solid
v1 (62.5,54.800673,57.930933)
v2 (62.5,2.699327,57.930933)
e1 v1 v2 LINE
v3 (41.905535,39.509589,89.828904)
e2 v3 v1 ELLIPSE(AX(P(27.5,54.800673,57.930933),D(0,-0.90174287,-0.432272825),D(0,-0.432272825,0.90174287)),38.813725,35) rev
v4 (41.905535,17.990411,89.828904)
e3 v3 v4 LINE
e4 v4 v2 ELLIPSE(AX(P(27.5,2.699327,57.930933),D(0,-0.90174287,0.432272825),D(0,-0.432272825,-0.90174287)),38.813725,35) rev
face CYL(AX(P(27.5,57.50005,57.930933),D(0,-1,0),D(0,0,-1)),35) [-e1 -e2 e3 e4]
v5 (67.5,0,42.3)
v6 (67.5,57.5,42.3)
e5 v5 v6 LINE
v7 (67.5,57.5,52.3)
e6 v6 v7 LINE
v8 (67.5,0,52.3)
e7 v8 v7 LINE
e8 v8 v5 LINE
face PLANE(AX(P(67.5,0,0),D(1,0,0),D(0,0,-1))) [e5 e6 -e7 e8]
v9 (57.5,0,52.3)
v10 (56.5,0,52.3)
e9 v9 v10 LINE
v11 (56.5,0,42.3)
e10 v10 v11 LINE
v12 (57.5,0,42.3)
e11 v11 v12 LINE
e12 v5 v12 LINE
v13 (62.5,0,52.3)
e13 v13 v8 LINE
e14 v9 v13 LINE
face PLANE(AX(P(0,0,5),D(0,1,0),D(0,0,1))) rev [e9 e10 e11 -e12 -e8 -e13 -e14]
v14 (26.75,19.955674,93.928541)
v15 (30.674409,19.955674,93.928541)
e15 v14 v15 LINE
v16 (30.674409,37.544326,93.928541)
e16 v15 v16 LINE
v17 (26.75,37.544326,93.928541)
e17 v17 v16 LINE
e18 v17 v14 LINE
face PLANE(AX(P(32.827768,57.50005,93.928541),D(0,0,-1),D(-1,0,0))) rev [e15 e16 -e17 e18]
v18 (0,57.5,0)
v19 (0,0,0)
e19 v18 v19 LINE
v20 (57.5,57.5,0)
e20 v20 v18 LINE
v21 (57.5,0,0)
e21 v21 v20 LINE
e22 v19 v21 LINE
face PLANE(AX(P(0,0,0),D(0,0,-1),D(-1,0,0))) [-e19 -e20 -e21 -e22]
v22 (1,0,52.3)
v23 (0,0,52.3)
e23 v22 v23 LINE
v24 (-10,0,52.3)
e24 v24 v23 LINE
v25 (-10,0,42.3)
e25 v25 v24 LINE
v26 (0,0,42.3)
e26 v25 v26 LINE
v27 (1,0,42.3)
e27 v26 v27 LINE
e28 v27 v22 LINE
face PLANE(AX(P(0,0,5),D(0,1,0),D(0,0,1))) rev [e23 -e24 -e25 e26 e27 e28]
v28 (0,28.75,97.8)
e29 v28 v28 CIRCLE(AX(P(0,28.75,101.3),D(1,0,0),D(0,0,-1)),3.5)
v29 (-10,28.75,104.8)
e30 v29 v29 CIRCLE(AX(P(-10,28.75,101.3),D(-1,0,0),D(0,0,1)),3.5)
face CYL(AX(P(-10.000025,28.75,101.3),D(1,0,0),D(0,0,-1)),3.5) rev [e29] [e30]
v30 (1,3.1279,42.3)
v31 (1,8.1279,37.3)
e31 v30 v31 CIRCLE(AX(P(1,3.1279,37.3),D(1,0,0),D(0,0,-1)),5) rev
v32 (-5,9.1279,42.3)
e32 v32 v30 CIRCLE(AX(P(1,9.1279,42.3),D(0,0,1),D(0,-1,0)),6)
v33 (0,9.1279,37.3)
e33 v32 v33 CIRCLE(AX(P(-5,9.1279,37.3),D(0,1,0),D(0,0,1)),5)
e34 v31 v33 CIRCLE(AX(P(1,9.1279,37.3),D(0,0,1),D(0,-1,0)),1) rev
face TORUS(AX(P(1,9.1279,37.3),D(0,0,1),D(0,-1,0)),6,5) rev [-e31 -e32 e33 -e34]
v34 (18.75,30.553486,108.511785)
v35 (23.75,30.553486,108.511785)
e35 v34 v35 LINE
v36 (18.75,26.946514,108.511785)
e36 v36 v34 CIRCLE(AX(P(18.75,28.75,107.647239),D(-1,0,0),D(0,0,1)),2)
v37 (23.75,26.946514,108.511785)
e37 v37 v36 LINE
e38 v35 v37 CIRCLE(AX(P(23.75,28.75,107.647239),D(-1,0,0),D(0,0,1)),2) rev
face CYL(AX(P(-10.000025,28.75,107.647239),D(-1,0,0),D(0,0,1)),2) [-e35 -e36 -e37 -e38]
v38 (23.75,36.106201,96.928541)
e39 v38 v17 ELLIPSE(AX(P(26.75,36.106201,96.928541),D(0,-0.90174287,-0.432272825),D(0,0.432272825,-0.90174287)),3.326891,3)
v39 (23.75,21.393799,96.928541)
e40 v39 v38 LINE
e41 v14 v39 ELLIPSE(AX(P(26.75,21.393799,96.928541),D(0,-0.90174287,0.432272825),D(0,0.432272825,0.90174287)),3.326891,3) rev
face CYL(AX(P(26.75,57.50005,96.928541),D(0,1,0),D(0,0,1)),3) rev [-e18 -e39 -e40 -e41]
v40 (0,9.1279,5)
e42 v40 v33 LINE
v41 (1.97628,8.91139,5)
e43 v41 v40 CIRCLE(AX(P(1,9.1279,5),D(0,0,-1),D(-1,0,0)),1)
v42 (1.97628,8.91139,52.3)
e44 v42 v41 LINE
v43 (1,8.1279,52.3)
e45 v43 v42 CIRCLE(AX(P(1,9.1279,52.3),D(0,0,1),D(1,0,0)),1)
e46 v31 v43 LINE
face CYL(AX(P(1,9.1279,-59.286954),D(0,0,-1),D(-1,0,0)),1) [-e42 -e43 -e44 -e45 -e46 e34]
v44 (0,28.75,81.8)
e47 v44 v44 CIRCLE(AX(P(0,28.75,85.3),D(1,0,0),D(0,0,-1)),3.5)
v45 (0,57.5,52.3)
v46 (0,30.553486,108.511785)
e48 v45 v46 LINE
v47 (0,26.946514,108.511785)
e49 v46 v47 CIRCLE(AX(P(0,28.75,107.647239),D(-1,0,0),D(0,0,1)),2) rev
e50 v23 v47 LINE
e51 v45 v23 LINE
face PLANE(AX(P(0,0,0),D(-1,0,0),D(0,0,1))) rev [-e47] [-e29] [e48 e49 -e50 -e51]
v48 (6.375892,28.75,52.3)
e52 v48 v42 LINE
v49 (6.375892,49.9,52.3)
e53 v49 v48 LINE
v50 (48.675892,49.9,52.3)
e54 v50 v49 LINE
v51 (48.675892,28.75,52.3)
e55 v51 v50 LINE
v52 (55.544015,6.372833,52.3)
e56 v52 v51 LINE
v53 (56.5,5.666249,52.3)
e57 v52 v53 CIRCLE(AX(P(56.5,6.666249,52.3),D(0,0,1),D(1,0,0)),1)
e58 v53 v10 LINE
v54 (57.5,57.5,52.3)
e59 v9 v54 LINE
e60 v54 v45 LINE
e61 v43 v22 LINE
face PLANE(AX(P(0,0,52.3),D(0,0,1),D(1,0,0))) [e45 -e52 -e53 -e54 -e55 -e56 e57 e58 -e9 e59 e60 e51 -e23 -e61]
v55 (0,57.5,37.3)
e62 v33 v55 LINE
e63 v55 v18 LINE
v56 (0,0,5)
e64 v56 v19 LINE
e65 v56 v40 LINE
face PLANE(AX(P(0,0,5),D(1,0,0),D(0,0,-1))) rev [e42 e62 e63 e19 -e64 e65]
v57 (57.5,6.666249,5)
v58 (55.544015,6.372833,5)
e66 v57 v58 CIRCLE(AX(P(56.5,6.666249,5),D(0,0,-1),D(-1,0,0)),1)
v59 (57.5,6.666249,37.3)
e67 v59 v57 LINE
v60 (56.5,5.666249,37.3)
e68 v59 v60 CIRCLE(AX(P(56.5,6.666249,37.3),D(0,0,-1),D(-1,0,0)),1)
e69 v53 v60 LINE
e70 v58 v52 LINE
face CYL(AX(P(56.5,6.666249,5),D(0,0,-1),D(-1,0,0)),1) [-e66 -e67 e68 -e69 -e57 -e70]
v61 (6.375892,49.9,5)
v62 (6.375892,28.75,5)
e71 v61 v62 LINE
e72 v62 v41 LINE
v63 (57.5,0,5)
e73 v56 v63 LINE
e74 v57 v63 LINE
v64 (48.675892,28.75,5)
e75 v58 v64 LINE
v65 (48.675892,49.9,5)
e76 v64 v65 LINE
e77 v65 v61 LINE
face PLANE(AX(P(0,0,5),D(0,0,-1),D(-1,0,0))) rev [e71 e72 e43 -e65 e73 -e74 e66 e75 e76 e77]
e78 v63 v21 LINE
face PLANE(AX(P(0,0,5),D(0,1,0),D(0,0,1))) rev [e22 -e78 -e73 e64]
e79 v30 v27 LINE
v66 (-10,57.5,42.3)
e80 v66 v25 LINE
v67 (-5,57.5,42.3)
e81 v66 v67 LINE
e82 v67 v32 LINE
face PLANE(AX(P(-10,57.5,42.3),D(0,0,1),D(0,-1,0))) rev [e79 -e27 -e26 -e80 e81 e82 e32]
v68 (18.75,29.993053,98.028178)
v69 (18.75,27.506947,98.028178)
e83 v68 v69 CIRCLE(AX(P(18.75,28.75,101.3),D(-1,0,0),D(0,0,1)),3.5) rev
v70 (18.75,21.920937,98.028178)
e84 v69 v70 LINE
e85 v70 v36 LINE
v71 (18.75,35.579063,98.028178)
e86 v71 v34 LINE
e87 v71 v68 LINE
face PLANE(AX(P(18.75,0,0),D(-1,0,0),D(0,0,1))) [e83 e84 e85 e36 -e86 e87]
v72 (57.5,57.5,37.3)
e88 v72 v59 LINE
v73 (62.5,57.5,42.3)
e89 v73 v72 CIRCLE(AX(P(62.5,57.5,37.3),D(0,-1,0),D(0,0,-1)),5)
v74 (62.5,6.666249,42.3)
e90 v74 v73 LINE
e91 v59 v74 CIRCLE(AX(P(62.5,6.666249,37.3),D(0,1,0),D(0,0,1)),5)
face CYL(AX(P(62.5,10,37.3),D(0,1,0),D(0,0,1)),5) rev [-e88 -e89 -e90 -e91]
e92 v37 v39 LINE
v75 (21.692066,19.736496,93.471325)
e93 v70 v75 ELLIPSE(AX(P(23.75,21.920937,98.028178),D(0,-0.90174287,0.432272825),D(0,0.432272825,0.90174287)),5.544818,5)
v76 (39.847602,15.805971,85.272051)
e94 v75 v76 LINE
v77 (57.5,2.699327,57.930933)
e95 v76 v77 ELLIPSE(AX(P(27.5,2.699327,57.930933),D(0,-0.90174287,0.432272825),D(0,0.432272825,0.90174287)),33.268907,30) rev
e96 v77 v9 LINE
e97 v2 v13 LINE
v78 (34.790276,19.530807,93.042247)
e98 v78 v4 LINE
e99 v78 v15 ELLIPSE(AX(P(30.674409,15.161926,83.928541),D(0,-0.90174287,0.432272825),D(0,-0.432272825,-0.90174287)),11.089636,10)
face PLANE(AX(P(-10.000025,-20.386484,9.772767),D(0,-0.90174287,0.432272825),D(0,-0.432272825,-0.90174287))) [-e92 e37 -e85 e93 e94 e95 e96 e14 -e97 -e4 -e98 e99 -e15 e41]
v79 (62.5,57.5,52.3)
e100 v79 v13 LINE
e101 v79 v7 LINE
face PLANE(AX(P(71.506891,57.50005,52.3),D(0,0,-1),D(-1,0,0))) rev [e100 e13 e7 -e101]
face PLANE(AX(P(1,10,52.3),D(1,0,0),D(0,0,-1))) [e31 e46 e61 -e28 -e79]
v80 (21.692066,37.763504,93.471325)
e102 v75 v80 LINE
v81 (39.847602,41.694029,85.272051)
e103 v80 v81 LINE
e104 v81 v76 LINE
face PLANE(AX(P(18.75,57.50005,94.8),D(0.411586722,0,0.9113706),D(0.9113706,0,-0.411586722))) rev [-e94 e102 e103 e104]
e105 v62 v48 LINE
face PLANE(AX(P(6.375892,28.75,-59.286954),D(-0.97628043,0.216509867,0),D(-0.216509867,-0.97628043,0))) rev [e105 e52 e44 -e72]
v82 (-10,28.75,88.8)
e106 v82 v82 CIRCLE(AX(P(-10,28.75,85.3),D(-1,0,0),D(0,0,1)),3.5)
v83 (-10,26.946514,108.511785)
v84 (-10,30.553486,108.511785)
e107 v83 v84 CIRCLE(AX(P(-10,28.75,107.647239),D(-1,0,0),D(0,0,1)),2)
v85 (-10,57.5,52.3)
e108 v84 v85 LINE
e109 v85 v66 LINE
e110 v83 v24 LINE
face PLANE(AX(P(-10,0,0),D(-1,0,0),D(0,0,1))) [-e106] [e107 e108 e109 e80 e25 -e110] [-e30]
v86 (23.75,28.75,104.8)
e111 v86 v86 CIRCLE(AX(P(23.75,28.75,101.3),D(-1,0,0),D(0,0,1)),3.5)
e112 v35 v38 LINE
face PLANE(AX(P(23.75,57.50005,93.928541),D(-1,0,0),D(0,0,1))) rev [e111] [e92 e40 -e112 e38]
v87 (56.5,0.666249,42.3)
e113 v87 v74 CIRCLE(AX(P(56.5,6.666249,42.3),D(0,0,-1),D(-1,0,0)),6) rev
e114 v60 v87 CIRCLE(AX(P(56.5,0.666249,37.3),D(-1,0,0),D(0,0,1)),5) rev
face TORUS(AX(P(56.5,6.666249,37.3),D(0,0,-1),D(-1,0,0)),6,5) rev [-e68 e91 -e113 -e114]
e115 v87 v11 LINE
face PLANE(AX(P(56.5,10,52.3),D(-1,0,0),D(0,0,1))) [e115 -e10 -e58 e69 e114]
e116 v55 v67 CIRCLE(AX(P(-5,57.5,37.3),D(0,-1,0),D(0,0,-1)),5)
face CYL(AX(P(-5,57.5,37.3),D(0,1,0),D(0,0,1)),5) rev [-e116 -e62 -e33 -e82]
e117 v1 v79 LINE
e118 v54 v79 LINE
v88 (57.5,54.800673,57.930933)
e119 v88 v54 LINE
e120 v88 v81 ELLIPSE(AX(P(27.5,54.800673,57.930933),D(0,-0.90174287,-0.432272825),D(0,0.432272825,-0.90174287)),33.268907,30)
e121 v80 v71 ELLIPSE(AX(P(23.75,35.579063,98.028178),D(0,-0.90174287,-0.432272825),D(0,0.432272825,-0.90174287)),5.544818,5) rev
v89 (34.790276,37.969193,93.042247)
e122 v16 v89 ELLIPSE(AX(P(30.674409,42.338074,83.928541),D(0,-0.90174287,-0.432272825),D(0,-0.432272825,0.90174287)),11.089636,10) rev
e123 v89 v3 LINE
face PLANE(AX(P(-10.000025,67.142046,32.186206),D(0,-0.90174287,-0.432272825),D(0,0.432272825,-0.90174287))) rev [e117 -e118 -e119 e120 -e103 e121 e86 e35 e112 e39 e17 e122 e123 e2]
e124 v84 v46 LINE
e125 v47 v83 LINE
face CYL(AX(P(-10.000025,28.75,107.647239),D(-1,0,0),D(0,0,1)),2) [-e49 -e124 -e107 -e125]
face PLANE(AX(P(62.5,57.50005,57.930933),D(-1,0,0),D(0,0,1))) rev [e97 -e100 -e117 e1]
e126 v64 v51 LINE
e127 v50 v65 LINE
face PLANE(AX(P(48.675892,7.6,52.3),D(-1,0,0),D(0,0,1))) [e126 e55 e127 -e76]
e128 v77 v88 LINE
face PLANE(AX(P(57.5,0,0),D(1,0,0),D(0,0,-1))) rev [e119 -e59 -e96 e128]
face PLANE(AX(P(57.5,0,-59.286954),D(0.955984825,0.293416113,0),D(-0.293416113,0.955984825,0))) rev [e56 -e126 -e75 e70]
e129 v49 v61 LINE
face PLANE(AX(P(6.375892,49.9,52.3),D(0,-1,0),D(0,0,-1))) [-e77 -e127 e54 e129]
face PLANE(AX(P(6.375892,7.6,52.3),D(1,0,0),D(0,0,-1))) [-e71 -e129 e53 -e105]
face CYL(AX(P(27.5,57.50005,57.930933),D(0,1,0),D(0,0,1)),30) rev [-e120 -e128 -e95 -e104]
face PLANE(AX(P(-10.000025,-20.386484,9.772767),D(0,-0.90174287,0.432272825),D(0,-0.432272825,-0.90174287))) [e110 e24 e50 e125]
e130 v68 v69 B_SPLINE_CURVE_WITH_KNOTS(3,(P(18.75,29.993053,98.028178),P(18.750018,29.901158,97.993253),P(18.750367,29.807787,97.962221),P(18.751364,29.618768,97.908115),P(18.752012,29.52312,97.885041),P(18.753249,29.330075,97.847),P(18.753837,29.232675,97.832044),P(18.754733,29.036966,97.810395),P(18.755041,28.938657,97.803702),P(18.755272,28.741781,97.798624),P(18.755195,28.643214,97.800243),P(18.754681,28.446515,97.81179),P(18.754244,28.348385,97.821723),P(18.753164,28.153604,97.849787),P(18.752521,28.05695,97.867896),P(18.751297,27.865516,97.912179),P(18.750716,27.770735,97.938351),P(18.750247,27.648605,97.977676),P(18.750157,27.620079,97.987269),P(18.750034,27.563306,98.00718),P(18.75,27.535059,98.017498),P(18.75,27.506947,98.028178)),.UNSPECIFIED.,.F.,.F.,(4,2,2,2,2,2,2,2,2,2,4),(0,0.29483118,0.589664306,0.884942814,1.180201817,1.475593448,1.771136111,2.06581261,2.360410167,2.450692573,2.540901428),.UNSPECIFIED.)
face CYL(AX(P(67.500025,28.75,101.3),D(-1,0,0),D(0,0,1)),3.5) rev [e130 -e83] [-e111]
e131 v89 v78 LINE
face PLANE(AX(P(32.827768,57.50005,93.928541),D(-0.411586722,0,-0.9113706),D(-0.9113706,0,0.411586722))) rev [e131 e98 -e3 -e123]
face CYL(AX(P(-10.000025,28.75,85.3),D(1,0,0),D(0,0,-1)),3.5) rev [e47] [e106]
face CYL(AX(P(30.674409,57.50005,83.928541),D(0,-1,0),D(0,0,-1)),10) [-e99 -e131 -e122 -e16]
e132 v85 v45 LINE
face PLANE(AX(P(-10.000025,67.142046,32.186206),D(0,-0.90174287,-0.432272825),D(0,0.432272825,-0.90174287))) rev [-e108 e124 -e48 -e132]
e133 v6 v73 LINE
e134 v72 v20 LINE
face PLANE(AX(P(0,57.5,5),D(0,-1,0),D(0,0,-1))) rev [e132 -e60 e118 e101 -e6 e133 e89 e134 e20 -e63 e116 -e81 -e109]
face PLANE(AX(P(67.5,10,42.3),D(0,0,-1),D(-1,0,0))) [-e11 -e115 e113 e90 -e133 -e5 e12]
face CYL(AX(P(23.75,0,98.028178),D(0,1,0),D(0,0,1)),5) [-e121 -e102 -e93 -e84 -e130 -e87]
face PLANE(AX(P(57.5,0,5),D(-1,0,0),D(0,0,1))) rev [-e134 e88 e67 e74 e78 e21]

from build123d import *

# Parameters (mm, degrees)
SKETCH2_W           = 57.5
SKETCH2_H           = 57.5
BOSS_EXTRUDE1_DEPTH = 5
SKETCH3_W           = 57.5
SKETCH3_H           = 57.5
SKETCH3_W_2         = 42.3
SKETCH3_H_2         = 42.3
BOSS_EXTRUDE2_DEPTH = 47.3
SKETCH4_W           = 70
SKETCH4_H           = 57.5
BOSS_EXTRUDE3_DEPTH = 10
SKETCH5_W           = 70
SKETCH5_H           = 57.5
BOSS_EXTRUDE4_DEPTH = 10
SKETCH6_W           = 35
SKETCH6_H           = 57.5
BOSS_EXTRUDE5_DEPTH = 38.75
SKETCH7_R           = 3.5
CUT_EXTRUDE1_DEPTH  = 144.086652068
SKETCH8_R           = 3.5
CUT_EXTRUDE2_DEPTH  = 144.086652068
FILLET1_R           = 30
CUT_EXTRUDE3_DEPTH  = 144.066205582
CUT_EXTRUDE4_REACH  = 109.048
CUT_EXTRUDE5_DEPTH  = 149.047084333
FILLET4_R           = 2
FILLET5_R           = 30
FILLET6_R           = 5
SKETCH12_W          = 11
SKETCH12_H          = 10
BOSS_EXTRUDE6_DEPTH = 10
FILLET7_R           = 1
FILLET8_R           = 5
CUT_EXTRUDE6_DEPTH  = 142.014244348
FILLET10_R          = 3
FILLET11_R          = 10


with BuildPart() as part:
    # Sketch2 → Boss-Extrude1 (new body)
    with BuildSketch(Plane.XY):
        with Locations((28.75, 28.75)):
            Rectangle(SKETCH2_W, SKETCH2_H)
    extrude(amount=BOSS_EXTRUDE1_DEPTH)

    # Sketch3 → Boss-Extrude2 (add)
    with BuildSketch(Plane.XY.offset(5)):
        with Locations((28.75, 28.75)):
            Rectangle(SKETCH3_W, SKETCH3_H)
        with Locations((27.525892101, 28.75)):
            Rectangle(SKETCH3_W_2, SKETCH3_H_2, mode=Mode.SUBTRACT)
    extrude(amount=BOSS_EXTRUDE2_DEPTH)

    # Sketch4 → Boss-Extrude3 (add)
    with BuildSketch(Plane.ZY):
        with Locations((77.3, 28.75)):
            Rectangle(SKETCH4_W, SKETCH4_H)
    extrude(amount=BOSS_EXTRUDE3_DEPTH)

    # Sketch5 → Boss-Extrude4 (add)
    with BuildSketch(Plane(origin=(57.5, 0, 0), x_dir=(0, 0, -1), z_dir=(1, 0, 0))):
        with Locations((-77.3, 28.75)):
            Rectangle(SKETCH5_W, SKETCH5_H)
    extrude(amount=BOSS_EXTRUDE4_DEPTH)

    # Sketch6 → Boss-Extrude5 (add)
    with BuildSketch(Plane.ZY.offset(-57.5)):
        with Locations((94.8, 28.75)):
            Rectangle(SKETCH6_W, SKETCH6_H)
    extrude(amount=BOSS_EXTRUDE5_DEPTH)

    # Sketch7 → Cut-Extrude1 (cut, through all)
    with BuildSketch(Plane(origin=(0, 0, 0), x_dir=(0, 0, -1), z_dir=(1, 0, 0))):
        with Locations((-101.3, 28.75)):
            Circle(SKETCH7_R)
        with Locations((-85.3, 28.75)):
            Circle(SKETCH7_R)
    extrude(amount=-CUT_EXTRUDE1_DEPTH, mode=Mode.SUBTRACT)

    # Sketch8 → Cut-Extrude2 (cut, through all)
    with BuildSketch(Plane(origin=(0, 0, 0), x_dir=(0, 0, -1), z_dir=(1, 0, 0))):
        with Locations((-101.3, 28.75)):
            Circle(SKETCH8_R)
    extrude(amount=CUT_EXTRUDE2_DEPTH, mode=Mode.SUBTRACT)

    # Fillet1
    # the kernel refuses this fillet: 30 mm, written as the material it takes off along each edge
    with BuildSketch(Plane(origin=(75, 57.5, 112.3), x_dir=(0, -1, 0), z_dir=(-1, 0, 0)), Plane(origin=(75, 0, 112.3), x_dir=(0, 0, -1), z_dir=(-1, 0, 0))) as fillet1_piece_1:
        with BuildLine():
            CenterArc((FILLET1_R, -FILLET1_R), FILLET1_R, 90, 90)
            Line((0, -FILLET1_R), (0, 0))
            Line((0, 0), (FILLET1_R, 0))
        make_face()
    extrude(amount=160, mode=Mode.SUBTRACT)
    with BuildSketch(Plane(origin=(142.5, 57.5, 112.3), x_dir=(0, -1, 0), z_dir=(-1, 0, 0)), Plane(origin=(142.5, 0, 112.3), x_dir=(0, 0, -1), z_dir=(-1, 0, 0))) as fillet1_piece_2:
        with BuildLine():
            CenterArc((FILLET1_R, -FILLET1_R), FILLET1_R, 90, 90)
            Line((0, -FILLET1_R), (0, 0))
            Line((0, 0), (FILLET1_R, 0))
        make_face()
    extrude(amount=198.75, mode=Mode.SUBTRACT)

    # Sketch9 → Cut-Extrude3 (cut, through all)
    with BuildSketch(Plane.XZ):
        Polygon((18.75, 77.3), (18.75, 94.8), (57.5, 77.3), align=None)
    extrude(amount=-CUT_EXTRUDE3_DEPTH, mode=Mode.SUBTRACT)

    # Cut-Extrude4: up to this face of the body (flat: up to its plane)
    cut_extrude4_end = Plane(part.part.faces().sort_by_distance((27.525892101, 28.75, 5))[0])
    # Sketch10 → Cut-Extrude4 (cut, up to the picked face)
    with BuildSketch(Plane.XY.offset(52.3), mode=Mode.PRIVATE) as cut_extrude4_sk1:
        Polygon((6.375892101, 28.75), (0, 0), (57.5, 0), (48.675892101, 28.75), align=None)
    cut_extrude4_tool1 = split(extrude(cut_extrude4_sk1.sketch, amount=-CUT_EXTRUDE4_REACH, mode=Mode.PRIVATE), bisect_by=cut_extrude4_end, keep=Keep.BOTH, mode=Mode.PRIVATE)
    add(cut_extrude4_tool1.solids().sort_by(Axis((28.169019, 13.645207, 52.3), (0, 0, -1)))[0], mode=Mode.SUBTRACT)

    # Sketch11 → Cut-Extrude5 (cut, through all)
    with BuildSketch(Plane(origin=(67.5, 0, 0), x_dir=(0, 0, -1), z_dir=(1, 0, 0))):
        with BuildLine():
            ThreePointArc((-82.3, 57.5), (-103.066559657, 49.150635095), (-112.273947021, 28.75))
            Line((-112.273947021, 28.75), (-52.3, 57.5))
            Line((-52.3, 57.5), (-82.3, 57.5))
        make_face()
        with BuildLine():
            Line((-52.3, 0), (-112.273947021, 28.75))
            ThreePointArc((-112.273947021, 28.75), (-103.066559657, 8.349364905), (-82.3, 0))
            Line((-82.3, 0), (-52.3, 0))
        make_face()
    extrude(amount=-CUT_EXTRUDE5_DEPTH, mode=Mode.SUBTRACT)

    # Fillet4
    fillet4_edges = [part.edges().sort_by_distance(p)[0] for p in [
        (-5, 28.75, 112.273947021),
        (43.125, 28.75, 112.273947021),
    ]]
    fillet(fillet4_edges, radius=FILLET4_R)

    # Fillet5
    fillet5_edges = [part.edges().sort_by_distance(p)[0] for p in [
        (57.5, 28.75, 77.3),
    ]]
    fillet(fillet5_edges, radius=FILLET5_R)

    # Fillet6
    # the kernel refuses this fillet: 5 mm, written as the material it takes off along each edge
    with BuildSketch(Plane(origin=(18.75, 12.302985171, 94.8), x_dir=(0.9113705996586746, 0, -0.4115867224264991), z_dir=(0, 1, 0))) as fillet6_piece_1:
        with BuildLine():
            CenterArc((FILLET6_R * 0.645635571077, -FILLET6_R), FILLET6_R, 90, 65.695450734)
            Line((-FILLET6_R * 0.265735028582, -FILLET6_R * 0.588413277574), (0, 0))
            Line((0, 0), (FILLET6_R * 0.645635571077, 0))
        make_face()
    extrude(amount=32.894029659, mode=Mode.SUBTRACT)

    # Sketch12 → Boss-Extrude6 (add)
    with BuildSketch(Plane.XZ):
        with Locations((-4.5, 47.3)):
            Rectangle(SKETCH12_W, SKETCH12_H)
        with Locations((62, 47.3)):
            Rectangle(SKETCH12_W, SKETCH12_H)
    extrude(amount=-BOSS_EXTRUDE6_DEPTH)

    # Fillet7
    # the kernel refuses this fillet: 1 mm, written as the material it takes off along each edge
    with BuildSketch(Plane(origin=(57.5, 0, 5), x_dir=(-0.29341611276772167, 0.9559848245491555, 0), z_dir=(0, 0, 1))) as fillet7_piece_1_section:
        with BuildLine():
            CenterArc((FILLET7_R * 6.66624885082, -FILLET7_R), FILLET7_R, 90, 162.937415162)
            Line((FILLET7_R * 6.37283273805, -FILLET7_R * 1.95598482455), (0, 0))
            Line((0, 0), (FILLET7_R * 6.66624885082, 0))
        make_face()
    fillet7_piece_1 = extrude(amount=53.965622127, mode=Mode.PRIVATE)
    fillet7_piece_1 = split(fillet7_piece_1, bisect_by=Plane(origin=(56.5, 4.962220999, 23.65), z_dir=(-1, 0, 0)), keep=Keep.TOP, mode=Mode.PRIVATE)
    add(fillet7_piece_1, mode=Mode.SUBTRACT)
    with BuildSketch(Plane(origin=(57.5, 0, 5), x_dir=(-0.29341611276772167, 0.9559848245491555, 0), z_dir=(0, 0, 1))) as fillet7_piece_2:
        with BuildLine():
            CenterArc((FILLET7_R * 6.66624885082, -FILLET7_R), FILLET7_R, 90, 162.937415162)
            Line((FILLET7_R * 6.37283273805, -FILLET7_R * 1.95598482455), (0, 0))
            Line((0, 0), (FILLET7_R * 6.66624885082, 0))
        make_face()
    extrude(amount=37.3, mode=Mode.SUBTRACT)
    with BuildSketch(Plane(origin=(0, 0, 65.119750157), x_dir=(0, 1, 0), z_dir=(0, 0, -1))) as fillet7_piece_3_section:
        with BuildLine():
            CenterArc((FILLET7_R * 9.12790006293, FILLET7_R), FILLET7_R, 102.504122974, 167.495877026)
            Line((FILLET7_R * 8.91139019581, FILLET7_R * 1.97628042971), (0, 0))
            Line((0, 0), (FILLET7_R * 9.12790006293, 0))
        make_face()
    fillet7_piece_3 = extrude(amount=60.119750157, mode=Mode.PRIVATE)
    fillet7_piece_3 = split(fillet7_piece_3, bisect_by=Plane(origin=(1, 7.031734734, 47.3), z_dir=(1, 0, 0)), keep=Keep.TOP, mode=Mode.PRIVATE)
    add(fillet7_piece_3, mode=Mode.SUBTRACT)
    with BuildSketch(Plane(origin=(0, 0, 42.3), x_dir=(0, 1, 0), z_dir=(0, 0, -1))) as fillet7_piece_4:
        with BuildLine():
            CenterArc((FILLET7_R * 9.12790006293, FILLET7_R), FILLET7_R, 102.504122974, 167.495877026)
            Line((FILLET7_R * 8.91139019581, FILLET7_R * 1.97628042971), (0, 0))
            Line((0, 0), (FILLET7_R * 9.12790006293, 0))
        make_face()
    extrude(amount=37.3, mode=Mode.SUBTRACT)

    # Fillet8
    fillet8_edges = [part.edges().sort_by_distance(p)[0] for p in [
        (0.292893219, 8.420793282, 42.3),
        (57.207106781, 5.95914207, 42.3),
        (0, 33.313950031, 42.3),
        (57.5, 32.083124425, 42.3),
    ]]
    fillet(fillet8_edges, radius=FILLET8_R)

    # Sketch13 → Cut-Extrude6 (cut, through all)
    with BuildSketch(Plane.XZ):
        with BuildLine():
            Line((32.827767642, 93.928540856), (23.75, 93.928540856))
            Line((23.75, 93.928540856), (23.75, 98.028177855))
            Line((23.75, 98.028177855), (23.75, 108.511784994))
            Line((23.75, 108.511784994), (23.75, 111.823529661))
            Line((23.75, 111.823529661), (71.506891102, 111.823529661))
            Line((71.506891102, 111.823529661), (71.506891102, 52.3))
            Line((71.506891102, 52.3), (62.5, 52.3))
            Line((62.5, 52.3), (62.5, 57.930932868))
            ThreePointArc((62.5, 57.930932868), (56.904028083, 76.915219331), (41.905535285, 89.828903856))
            Line((41.905535285, 89.828903856), (32.827767642, 93.928540856))
        make_face()
    extrude(amount=-CUT_EXTRUDE6_DEPTH, mode=Mode.SUBTRACT)

    # Fillet10
    fillet10_edges = [part.edges().sort_by_distance(p)[0] for p in [
        (23.75, 28.75, 93.928540856),
    ]]
    fillet(fillet10_edges, radius=FILLET10_R)

    # Fillet11
    fillet11_edges = [part.edges().sort_by_distance(p)[0] for p in [
        (32.827767642, 28.75, 93.928540856),
    ]]
    fillet(fillet11_edges, radius=FILLET11_R)


solid = part.part
